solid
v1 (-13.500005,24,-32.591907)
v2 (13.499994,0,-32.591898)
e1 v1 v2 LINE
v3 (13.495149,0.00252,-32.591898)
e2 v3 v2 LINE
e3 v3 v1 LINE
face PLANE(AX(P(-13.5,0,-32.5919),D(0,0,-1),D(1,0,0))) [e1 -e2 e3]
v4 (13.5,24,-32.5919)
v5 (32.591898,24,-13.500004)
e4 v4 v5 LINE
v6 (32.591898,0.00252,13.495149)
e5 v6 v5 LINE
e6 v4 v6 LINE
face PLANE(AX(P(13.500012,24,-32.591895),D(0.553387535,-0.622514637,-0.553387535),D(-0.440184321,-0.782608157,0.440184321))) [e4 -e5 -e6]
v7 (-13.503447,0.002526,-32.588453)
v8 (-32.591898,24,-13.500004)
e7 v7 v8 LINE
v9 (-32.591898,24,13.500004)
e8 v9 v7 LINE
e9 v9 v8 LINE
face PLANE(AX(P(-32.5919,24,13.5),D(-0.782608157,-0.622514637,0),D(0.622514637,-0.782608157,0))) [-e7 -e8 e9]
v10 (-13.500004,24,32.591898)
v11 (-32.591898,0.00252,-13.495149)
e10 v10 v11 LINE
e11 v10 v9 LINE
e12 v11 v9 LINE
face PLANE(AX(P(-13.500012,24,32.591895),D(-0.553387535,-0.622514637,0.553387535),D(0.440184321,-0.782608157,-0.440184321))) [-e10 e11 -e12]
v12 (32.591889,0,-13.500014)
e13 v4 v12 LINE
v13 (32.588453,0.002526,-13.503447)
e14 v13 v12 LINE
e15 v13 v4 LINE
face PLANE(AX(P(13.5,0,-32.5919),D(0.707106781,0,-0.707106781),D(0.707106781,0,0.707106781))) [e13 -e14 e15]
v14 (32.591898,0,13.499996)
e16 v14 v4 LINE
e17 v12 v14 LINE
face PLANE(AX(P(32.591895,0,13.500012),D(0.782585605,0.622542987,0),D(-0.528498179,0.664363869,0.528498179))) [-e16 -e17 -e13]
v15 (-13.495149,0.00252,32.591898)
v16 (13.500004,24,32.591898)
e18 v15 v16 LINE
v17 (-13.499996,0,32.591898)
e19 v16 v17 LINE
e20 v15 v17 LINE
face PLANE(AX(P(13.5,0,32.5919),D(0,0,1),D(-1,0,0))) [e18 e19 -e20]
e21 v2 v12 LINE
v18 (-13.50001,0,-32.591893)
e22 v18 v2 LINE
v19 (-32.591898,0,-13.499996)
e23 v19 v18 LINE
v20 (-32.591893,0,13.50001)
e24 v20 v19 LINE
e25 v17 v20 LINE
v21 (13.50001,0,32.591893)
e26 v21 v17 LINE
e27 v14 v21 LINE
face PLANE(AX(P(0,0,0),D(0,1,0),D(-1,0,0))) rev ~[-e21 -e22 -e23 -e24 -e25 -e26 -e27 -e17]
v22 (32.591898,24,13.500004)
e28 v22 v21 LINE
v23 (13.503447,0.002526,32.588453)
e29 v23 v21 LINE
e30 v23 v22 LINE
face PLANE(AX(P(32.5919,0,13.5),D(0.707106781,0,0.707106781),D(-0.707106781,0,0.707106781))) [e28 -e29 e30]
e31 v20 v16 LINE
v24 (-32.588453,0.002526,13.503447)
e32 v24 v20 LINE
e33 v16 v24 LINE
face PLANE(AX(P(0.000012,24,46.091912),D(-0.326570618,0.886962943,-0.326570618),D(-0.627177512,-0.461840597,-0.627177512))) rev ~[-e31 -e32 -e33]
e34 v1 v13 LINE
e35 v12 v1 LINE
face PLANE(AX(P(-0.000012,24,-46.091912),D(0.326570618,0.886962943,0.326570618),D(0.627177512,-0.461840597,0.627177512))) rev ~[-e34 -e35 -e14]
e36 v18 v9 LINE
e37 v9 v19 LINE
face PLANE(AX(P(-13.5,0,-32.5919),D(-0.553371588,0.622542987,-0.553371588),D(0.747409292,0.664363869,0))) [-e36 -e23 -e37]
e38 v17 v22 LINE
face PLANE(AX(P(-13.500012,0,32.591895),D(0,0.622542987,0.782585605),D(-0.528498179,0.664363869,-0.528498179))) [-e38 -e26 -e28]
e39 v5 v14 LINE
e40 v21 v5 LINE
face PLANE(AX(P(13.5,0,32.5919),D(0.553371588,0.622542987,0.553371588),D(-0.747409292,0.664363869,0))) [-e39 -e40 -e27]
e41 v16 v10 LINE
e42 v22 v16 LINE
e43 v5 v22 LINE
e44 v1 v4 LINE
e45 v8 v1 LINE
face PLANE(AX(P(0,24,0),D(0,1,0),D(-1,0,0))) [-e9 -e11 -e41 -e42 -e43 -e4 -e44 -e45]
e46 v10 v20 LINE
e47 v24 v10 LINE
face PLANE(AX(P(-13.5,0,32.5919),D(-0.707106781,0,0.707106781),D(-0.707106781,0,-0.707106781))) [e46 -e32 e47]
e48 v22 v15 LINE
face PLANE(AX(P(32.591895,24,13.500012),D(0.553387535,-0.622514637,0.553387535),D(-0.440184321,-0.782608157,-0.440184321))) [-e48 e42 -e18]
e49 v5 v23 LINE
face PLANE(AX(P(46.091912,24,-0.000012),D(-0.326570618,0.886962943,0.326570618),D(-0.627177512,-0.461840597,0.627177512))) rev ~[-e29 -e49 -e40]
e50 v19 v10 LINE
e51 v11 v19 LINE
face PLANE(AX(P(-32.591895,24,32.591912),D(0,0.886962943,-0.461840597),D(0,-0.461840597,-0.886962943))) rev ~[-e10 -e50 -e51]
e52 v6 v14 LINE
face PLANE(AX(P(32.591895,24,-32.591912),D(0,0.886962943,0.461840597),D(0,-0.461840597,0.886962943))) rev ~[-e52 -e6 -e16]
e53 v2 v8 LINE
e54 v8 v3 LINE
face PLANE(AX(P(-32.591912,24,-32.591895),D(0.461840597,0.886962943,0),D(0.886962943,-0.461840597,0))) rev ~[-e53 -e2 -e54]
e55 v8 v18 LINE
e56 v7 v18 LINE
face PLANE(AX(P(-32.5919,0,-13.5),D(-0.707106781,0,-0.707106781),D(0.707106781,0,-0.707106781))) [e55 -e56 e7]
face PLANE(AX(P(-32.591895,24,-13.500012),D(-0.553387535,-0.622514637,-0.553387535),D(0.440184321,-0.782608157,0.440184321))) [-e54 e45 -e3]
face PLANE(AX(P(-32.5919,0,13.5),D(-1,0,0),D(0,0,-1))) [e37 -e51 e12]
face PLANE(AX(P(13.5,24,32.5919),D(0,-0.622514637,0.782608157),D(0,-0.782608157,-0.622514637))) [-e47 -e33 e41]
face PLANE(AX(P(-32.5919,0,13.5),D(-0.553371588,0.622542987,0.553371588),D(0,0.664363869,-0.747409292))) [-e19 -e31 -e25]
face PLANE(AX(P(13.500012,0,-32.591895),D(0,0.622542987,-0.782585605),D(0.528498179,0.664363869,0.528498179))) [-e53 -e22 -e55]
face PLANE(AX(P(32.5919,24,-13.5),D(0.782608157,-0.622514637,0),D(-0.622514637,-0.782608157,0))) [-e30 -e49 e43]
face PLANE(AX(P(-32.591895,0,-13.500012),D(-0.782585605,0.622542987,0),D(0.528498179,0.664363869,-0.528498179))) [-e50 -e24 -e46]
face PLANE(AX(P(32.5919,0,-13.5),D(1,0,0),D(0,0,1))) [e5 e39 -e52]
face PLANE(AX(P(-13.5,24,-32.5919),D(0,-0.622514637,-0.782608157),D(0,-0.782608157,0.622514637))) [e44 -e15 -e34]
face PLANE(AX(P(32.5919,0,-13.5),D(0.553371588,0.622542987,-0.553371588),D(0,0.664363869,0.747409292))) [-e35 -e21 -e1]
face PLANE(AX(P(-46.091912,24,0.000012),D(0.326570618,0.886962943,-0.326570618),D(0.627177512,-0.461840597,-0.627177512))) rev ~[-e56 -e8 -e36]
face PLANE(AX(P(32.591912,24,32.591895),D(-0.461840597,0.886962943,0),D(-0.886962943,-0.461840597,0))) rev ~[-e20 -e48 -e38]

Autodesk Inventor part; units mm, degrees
sketch "스케치1" plane through (0, 0, 0) normal (0, 1, 0) x (-1, 0, 0)
  line L0 (-31.9919, 13.2515) -> (-13.2515, 31.9919)
  line L1 (-13.2515, 31.9919) -> (13.2515, 31.9919)
  line L2 (13.2515, 31.9919) -> (31.9919, 13.2515)
  line L3 (31.9919, 13.2515) -> (31.9919, -13.2515)
  line L4 (31.9919, -13.2515) -> (13.2515, -31.9919)
  line L5 (13.2515, -31.9919) -> (-13.2515, -31.9919)
  line L6 (-13.2515, -31.9919) -> (-31.9919, -13.2515)
  line L7 (-31.9919, -13.2515) -> (-31.9919, 13.2515)
  line L8 (-13.5, 32.5919) -> (13.5, 32.5919)
  line L9 (13.5, 32.5919) -> (32.5919, 13.5)
  line L10 (32.5919, 13.5) -> (32.5919, -13.5)
  line L11 (32.5919, -13.5) -> (13.5, -32.5919)
  line L12 (13.5, -32.5919) -> (-13.5, -32.5919)
  line L13 (-13.5, -32.5919) -> (-32.5919, -13.5)
  line L14 (-32.5919, -13.5) -> (-32.5919, 13.5)
  line L15 (-32.5919, 13.5) -> (-13.5, 32.5919)
  point P0 (0, 0)
  point P1 (0, 0)
  point P2 (0, 0)
  dimension "d2" = 0.6
  dimension "d118" = 27
extrude "돌출2" add sketch "스케치1" along normal blind 24 contours L0 L1 L2 L3 L4 L5 L6 L7 | L8 L9 L10 L11 L12 L13 L14 L15
ref_plane "작업 평면24" through (-13.5, 24, -32.5919) normal (0, -0.622543, -0.7825856) x (1, 0, 0)
sketch "스케치27" plane through (13.5, 0, -32.5919) normal (0, 0, -1) x (-1, 0, 0)
  line L0 (27, 24) -> (46.0919, 24) projected
  line L1 (0, 24) -> (27, 24) projected
  line L2 (27, 24) -> (0, 24)
  line L3 (0, 24) -> (-19.0919, 0)
  line L4 (-19.0919, 0) -> (27, 24)
  line L5 (0, 0) -> (0, 24) projected
  line L6 (0, 24) -> (0, 9.9411)
  point P0 (13.5, 0)
extrude "돌출22" cut sketch "스케치27" against normal up to surface surface through (-13.5, 24, -32.5919) normal (0, -0.622543, -0.7825856)
ref_plane "작업 평면26" through (32.5919, 0, -13.5) normal (0.5533716, 0.622543, -0.5533716) x (-0.7071068, 0, -0.7071068)
sketch "스케치28" plane through (13.5, 0, -32.5919) normal (0.7071068, 0, -0.7071068) x (-0.7071068, 0, -0.7071068)
  line L0 (-27.3314, 0) -> (-27.3314, 12) projected
  line L1 (19.0919, 0) -> (0, 0) projected
  line L2 (-27, 0) -> (0, 0)
  line L3 (19.0919, 0) -> (19.0919, 24) projected
  line L4 (0, 0) -> (19.0919, 24)
  line L5 (19.0919, 24) -> (-27, 0)
  point P0 (-13.5, 0)
  point P1 (-27.3314, 12)
extrude "돌출23" cut sketch "스케치28" against normal up to surface contours L2 L5 L4 surface through (32.5919, 0, -13.5) normal (0.5533716, 0.622543, -0.5533716)
pattern_circular "원형 패턴5" count 8 over 360 about axis through (0, -10, 0) along (0, 1, 0) of "돌출23", "돌출22"
ref_plane "작업 평면27" through (0, 12, 0) normal (0, 1, 0) x (1, 0, 0)
properties part number "팔각형 OV-PAM 층 한개"
